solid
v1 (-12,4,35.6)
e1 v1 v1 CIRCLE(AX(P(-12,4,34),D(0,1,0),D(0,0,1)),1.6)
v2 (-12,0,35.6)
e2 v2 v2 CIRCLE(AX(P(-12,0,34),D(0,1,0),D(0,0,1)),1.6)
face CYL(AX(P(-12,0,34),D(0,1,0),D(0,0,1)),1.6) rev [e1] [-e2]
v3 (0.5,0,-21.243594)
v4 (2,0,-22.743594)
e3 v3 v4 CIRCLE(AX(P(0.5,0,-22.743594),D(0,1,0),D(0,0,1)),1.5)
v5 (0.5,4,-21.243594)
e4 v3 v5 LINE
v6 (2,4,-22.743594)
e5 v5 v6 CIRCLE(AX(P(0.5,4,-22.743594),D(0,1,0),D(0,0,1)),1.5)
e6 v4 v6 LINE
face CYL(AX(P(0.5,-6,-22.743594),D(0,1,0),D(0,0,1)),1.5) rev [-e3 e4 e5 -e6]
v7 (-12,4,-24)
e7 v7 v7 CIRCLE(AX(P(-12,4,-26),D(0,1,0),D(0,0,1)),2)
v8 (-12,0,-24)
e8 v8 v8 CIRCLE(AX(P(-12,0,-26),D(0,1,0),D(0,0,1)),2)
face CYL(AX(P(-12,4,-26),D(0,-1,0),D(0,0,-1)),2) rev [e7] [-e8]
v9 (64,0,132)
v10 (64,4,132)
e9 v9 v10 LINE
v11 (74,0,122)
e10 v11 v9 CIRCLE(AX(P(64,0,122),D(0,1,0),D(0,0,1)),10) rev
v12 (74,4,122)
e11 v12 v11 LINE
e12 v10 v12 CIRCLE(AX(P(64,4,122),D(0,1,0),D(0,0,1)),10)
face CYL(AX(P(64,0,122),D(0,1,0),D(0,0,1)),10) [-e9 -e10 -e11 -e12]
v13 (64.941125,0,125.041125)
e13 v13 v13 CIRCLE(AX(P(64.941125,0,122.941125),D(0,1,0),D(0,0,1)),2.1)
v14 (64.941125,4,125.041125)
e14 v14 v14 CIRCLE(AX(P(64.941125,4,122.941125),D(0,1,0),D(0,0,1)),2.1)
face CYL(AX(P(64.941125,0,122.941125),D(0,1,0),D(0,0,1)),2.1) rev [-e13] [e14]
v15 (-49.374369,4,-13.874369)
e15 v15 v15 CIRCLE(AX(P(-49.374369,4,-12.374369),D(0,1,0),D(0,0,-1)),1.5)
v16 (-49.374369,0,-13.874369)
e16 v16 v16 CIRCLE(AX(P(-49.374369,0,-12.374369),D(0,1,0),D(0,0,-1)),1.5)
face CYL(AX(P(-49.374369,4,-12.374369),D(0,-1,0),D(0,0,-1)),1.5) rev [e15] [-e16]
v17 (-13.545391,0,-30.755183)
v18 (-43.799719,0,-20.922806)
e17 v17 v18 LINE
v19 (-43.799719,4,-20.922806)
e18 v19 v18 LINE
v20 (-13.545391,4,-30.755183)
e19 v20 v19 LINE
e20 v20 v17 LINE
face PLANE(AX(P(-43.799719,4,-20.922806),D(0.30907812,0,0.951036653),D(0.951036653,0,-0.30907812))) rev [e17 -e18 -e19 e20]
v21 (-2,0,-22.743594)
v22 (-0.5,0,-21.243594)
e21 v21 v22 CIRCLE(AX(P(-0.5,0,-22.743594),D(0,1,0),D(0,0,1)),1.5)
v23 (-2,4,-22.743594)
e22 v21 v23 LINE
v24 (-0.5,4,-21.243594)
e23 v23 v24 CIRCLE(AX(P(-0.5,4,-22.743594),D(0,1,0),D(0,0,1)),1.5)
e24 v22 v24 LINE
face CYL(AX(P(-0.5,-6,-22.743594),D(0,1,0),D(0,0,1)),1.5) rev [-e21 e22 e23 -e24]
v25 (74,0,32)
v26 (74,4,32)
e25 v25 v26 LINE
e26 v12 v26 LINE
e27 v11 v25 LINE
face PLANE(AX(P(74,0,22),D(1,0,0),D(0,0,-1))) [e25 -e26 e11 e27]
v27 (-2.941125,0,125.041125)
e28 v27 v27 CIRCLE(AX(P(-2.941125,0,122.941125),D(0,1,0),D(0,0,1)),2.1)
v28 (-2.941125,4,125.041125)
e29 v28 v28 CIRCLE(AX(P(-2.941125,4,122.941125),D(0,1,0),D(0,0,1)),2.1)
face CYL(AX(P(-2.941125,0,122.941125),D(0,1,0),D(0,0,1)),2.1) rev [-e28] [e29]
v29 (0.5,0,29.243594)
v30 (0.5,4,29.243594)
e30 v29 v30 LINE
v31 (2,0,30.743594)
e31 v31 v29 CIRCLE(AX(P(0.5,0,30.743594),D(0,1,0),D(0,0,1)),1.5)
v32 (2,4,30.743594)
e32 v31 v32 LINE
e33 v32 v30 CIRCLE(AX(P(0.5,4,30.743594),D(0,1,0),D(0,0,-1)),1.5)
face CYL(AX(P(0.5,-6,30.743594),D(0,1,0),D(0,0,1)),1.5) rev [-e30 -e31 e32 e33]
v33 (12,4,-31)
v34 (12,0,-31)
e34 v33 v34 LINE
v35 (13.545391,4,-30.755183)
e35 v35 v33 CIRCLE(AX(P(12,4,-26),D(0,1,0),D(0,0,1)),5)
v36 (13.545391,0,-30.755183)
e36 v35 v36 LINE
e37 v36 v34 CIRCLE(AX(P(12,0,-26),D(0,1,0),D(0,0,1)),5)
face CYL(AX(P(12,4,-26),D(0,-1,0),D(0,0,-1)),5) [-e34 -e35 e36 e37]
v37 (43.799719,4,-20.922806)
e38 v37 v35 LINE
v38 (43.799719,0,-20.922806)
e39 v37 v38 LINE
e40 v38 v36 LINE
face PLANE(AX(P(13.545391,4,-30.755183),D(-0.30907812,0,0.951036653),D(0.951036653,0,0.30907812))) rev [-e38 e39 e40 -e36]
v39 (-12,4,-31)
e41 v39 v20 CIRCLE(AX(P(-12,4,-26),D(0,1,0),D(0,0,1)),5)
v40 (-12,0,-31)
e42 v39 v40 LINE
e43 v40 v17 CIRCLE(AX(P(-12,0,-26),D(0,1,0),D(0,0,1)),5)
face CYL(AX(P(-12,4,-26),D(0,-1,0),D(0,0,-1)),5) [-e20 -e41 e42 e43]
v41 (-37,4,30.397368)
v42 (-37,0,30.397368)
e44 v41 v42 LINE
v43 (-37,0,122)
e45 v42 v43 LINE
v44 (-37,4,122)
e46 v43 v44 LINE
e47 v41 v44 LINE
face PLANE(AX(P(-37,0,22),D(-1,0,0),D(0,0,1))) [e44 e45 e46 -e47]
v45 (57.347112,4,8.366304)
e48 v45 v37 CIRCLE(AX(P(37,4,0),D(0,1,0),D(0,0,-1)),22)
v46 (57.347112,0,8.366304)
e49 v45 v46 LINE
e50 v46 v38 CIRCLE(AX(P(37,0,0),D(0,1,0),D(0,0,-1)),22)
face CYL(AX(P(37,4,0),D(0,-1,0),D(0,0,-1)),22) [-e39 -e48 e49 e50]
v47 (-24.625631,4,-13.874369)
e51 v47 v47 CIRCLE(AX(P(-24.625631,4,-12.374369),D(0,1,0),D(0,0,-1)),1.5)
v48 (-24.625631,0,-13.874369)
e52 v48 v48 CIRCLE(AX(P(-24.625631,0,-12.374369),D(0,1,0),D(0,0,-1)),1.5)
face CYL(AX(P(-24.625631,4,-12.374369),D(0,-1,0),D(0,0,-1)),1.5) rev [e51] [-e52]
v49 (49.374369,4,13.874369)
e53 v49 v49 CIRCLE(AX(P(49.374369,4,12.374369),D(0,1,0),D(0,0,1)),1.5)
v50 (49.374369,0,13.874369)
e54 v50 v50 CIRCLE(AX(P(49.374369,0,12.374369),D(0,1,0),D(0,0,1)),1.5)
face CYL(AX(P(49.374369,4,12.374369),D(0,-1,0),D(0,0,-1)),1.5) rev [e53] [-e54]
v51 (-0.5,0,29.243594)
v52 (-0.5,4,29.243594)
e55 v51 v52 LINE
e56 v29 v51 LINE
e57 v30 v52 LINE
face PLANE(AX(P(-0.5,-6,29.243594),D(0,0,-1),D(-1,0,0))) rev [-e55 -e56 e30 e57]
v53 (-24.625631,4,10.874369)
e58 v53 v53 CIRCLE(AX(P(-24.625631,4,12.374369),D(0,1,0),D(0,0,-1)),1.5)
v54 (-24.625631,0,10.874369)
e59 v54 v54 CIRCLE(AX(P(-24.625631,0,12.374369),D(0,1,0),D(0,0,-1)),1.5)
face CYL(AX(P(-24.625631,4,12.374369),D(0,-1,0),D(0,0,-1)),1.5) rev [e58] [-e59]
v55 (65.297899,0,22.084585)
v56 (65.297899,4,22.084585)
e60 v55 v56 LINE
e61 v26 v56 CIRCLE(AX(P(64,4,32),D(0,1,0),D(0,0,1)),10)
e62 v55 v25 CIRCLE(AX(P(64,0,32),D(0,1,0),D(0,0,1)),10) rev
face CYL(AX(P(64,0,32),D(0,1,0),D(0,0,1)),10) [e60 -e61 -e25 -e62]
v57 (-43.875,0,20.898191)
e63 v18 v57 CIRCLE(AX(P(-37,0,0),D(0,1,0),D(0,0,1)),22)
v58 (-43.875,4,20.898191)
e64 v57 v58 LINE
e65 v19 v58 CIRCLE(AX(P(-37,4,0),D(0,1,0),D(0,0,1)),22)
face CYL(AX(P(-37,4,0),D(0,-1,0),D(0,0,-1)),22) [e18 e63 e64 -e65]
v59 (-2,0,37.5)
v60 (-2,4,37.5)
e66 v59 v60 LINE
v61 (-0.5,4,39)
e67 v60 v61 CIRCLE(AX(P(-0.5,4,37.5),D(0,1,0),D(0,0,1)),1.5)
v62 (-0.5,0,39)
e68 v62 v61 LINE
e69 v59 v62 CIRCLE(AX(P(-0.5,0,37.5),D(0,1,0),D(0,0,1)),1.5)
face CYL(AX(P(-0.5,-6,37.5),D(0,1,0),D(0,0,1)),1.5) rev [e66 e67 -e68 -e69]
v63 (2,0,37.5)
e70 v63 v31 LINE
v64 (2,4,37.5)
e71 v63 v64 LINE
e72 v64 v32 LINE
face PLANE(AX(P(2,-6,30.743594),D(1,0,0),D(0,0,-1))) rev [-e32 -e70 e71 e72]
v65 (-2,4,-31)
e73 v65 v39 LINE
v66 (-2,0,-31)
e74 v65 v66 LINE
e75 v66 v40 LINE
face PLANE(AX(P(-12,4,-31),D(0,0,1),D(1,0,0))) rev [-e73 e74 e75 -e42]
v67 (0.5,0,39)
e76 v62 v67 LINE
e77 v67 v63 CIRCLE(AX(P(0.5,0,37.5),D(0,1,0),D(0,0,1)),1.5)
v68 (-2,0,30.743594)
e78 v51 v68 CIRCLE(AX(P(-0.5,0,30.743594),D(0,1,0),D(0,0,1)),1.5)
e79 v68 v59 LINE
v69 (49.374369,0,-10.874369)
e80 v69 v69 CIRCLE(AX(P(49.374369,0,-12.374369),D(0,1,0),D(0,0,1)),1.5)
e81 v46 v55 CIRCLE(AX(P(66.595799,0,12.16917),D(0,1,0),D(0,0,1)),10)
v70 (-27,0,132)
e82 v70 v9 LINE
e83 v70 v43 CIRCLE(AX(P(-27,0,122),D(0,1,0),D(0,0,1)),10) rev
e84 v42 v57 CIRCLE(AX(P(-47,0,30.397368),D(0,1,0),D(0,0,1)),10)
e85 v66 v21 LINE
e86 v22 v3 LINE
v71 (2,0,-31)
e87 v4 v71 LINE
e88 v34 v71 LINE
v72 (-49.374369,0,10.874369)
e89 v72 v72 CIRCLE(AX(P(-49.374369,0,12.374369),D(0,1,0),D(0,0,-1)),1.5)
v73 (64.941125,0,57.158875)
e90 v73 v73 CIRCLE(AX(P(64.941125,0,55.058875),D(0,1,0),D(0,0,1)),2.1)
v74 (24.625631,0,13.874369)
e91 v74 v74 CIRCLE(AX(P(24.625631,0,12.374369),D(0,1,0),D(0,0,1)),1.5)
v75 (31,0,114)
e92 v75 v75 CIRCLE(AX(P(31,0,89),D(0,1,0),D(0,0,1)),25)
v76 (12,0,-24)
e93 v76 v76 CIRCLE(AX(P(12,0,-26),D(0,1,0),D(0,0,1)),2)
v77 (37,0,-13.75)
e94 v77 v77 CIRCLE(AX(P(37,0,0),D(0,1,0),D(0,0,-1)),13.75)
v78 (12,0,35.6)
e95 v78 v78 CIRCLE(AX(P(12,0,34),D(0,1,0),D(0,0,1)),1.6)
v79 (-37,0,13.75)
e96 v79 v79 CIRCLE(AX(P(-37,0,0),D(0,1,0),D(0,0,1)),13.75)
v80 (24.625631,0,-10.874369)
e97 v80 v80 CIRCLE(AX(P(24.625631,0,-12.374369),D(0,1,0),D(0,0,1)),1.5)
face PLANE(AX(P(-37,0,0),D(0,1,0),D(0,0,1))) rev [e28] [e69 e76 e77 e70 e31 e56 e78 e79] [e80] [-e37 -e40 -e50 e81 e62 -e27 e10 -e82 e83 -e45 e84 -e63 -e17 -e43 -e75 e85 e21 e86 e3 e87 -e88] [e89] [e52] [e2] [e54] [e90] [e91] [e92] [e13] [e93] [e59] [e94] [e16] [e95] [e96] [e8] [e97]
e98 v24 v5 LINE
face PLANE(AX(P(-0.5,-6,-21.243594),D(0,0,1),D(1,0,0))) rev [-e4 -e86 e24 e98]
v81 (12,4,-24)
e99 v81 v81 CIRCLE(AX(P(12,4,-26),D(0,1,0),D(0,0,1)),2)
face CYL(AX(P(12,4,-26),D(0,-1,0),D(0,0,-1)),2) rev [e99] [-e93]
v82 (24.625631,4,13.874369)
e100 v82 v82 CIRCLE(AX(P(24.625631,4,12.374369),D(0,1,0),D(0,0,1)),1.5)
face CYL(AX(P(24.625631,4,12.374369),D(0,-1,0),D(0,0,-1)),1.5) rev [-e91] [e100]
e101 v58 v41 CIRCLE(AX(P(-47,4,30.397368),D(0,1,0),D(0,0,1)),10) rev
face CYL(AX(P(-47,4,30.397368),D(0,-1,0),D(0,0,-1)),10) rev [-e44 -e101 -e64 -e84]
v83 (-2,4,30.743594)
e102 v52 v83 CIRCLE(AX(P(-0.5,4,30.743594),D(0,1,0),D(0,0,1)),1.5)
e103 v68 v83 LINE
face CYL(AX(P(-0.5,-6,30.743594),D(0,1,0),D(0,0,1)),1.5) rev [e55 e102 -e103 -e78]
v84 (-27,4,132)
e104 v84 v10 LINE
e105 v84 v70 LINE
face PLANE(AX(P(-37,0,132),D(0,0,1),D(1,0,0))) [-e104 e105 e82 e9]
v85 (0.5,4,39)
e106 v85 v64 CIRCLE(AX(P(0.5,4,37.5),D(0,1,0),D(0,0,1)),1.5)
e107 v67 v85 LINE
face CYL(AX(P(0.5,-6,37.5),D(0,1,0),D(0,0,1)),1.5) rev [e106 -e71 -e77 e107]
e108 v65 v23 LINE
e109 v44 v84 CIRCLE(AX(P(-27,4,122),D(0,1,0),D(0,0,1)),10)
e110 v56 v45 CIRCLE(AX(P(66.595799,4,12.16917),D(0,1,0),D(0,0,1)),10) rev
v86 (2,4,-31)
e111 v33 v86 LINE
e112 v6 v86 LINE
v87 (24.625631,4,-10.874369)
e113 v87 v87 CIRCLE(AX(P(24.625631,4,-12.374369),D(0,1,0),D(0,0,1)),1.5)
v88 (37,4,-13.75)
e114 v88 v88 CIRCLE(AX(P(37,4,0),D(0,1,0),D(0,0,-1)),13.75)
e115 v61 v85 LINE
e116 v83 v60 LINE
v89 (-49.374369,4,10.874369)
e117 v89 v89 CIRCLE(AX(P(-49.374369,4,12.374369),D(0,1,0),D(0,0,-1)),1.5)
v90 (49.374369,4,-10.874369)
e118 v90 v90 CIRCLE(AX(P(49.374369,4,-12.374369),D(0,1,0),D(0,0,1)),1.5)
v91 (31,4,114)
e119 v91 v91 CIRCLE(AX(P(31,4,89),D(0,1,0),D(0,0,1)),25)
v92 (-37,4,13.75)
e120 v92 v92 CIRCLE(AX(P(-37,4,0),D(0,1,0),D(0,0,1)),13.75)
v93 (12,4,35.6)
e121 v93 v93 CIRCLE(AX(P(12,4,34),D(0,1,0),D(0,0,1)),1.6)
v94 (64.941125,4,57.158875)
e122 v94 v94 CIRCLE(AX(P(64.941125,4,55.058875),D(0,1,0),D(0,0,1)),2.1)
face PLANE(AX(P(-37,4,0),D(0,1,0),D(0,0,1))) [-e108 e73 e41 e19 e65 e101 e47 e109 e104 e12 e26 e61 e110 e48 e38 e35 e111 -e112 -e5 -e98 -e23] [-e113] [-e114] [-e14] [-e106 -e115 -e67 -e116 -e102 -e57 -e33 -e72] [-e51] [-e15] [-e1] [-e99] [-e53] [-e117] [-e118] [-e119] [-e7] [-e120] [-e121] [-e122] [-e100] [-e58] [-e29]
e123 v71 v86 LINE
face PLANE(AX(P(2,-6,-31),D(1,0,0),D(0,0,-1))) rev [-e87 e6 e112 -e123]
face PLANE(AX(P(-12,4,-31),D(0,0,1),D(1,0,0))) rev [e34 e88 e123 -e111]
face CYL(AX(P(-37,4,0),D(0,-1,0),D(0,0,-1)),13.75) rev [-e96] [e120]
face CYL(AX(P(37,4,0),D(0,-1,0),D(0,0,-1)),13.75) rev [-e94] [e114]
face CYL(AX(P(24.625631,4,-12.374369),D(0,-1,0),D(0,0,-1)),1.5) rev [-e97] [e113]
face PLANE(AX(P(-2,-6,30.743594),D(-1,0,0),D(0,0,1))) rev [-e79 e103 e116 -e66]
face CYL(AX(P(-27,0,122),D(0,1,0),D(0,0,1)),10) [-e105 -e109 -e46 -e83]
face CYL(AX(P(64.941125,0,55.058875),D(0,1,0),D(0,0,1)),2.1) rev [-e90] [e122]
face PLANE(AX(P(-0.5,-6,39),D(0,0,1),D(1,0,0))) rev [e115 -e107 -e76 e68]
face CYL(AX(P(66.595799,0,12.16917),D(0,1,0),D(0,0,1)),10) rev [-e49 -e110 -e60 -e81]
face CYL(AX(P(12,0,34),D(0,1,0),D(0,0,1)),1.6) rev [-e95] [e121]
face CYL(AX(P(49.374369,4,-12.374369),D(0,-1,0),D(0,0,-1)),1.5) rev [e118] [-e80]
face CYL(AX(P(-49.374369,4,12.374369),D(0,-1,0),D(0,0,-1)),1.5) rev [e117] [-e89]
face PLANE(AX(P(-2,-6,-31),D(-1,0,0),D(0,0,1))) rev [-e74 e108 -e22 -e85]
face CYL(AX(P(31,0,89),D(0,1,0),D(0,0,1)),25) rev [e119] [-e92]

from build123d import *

# Parameters (mm, degrees)
SKETCH_1_R          = 2
SKETCH_1_R_2        = 1.5
SKETCH_1_R_3        = 13.75
EXTRUDE_1_DEPTH     = 4
SKETCH1_W           = 111
SKETCH1_H           = 110
SKETCH1_R           = 1.6
SKETCH1_R_2         = 2.1
SKETCH1_R_3         = 25
BOSS_EXTRUDE1_DEPTH = 4
FILLET1_R           = 10
FILLET2_DEPTH       = 4
CUT_EXTRUDE1_DEPTH  = 10


with BuildPart() as part:
    # 草图1 → 凸台-拉伸1 (new body)
    with BuildSketch(Plane(origin=(0, 0, 0), x_dir=(1, 0, 0), z_dir=(0, 1, 0))):
        with BuildLine():
            Line((-43.799718629, 20.922806374), (-13.545390598, 30.755183267))
            ThreePointArc((-13.545390598, 30.755183267), (-12.782331025, 30.938416565), (-12, 31))
            Line((-12, 31), (12, 31))
            ThreePointArc((12, 31), (12.782331025, 30.938416565), (13.545390598, 30.755183267))
            Line((13.545390598, 30.755183267), (43.799718629, 20.922806374))
            ThreePointArc((43.799718629, 20.922806374), (58.729032885, -3.442256511), (37, -22))
            Line((37, -22), (-37, -22))
            ThreePointArc((-37, -22), (-58.729032885, -3.442256511), (-43.799718629, 20.922806374))
        make_face()
        with Locations(Location((-12, 26, 0), (0, 0, 270))):
            Circle(SKETCH_1_R, mode=Mode.SUBTRACT)
        with Locations(Location((12, 26, 0), (0, 0, 270))):
            Circle(SKETCH_1_R, mode=Mode.SUBTRACT)
        with Locations(Location((49.374368671, 12.374368671, 0), (0, 0, 270))):
            Circle(SKETCH_1_R_2, mode=Mode.SUBTRACT)
        with Locations(Location((49.374368671, -12.374368671, 0), (0, 0, 270))):
            Circle(SKETCH_1_R_2, mode=Mode.SUBTRACT)
        with Locations(Location((24.625631329, -12.374368671, 0), (0, 0, 270))):
            Circle(SKETCH_1_R_2, mode=Mode.SUBTRACT)
        with Locations(Location((24.625631329, 12.374368671, 0), (0, 0, 270))):
            Circle(SKETCH_1_R_2, mode=Mode.SUBTRACT)
        with Locations(Location((-49.374368671, -12.374368671, 0), (0, 0, 90))):
            Circle(SKETCH_1_R_2, mode=Mode.SUBTRACT)
        with Locations(Location((-24.625631329, -12.374368671, 0), (0, 0, 90))):
            Circle(SKETCH_1_R_2, mode=Mode.SUBTRACT)
        with Locations(Location((-49.374368671, 12.374368671, 0), (0, 0, 90))):
            Circle(SKETCH_1_R_2, mode=Mode.SUBTRACT)
        with Locations(Location((-24.625631329, 12.374368671, 0), (0, 0, 90))):
            Circle(SKETCH_1_R_2, mode=Mode.SUBTRACT)
        with Locations(Location((-37, 0, 0), (0, 0, 270))):
            Circle(SKETCH_1_R_3, mode=Mode.SUBTRACT)
        with Locations(Location((37, 0, 0), (0, 0, 90))):
            Circle(SKETCH_1_R_3, mode=Mode.SUBTRACT)
    extrude(amount=EXTRUDE_1_DEPTH)

    # Sketch1 → Boss-Extrude1 (add)
    with BuildSketch(Plane(origin=(0, 4, 0), x_dir=(1, 0, 0), z_dir=(0, 1, 0))):
        with Locations((18.5, -77)):
            Rectangle(SKETCH1_W, SKETCH1_H)
        with Locations(Location((12, -34, 0), (0, 0, 270))):
            Circle(SKETCH1_R, mode=Mode.SUBTRACT)
        with Locations(Location((-12, -34, 0), (0, 0, 270))):
            Circle(SKETCH1_R, mode=Mode.SUBTRACT)
        with Locations(Location((-2.941125497, -122.941125497, 0), (0, 0, 270))):
            Circle(SKETCH1_R_2, mode=Mode.SUBTRACT)
        with Locations(Location((64.941125497, -122.941125497, 0), (0, 0, 270))):
            Circle(SKETCH1_R_2, mode=Mode.SUBTRACT)
        with Locations(Location((64.941125497, -55.058874503, 0), (0, 0, 270))):
            Circle(SKETCH1_R_2, mode=Mode.SUBTRACT)
        with Locations(Location((31, -89, 0), (0, 0, 270))):
            Circle(SKETCH1_R_3, mode=Mode.SUBTRACT)
    extrude(amount=-BOSS_EXTRUDE1_DEPTH)

    # Fillet1
    fillet1_edges = [part.edges().sort_by_distance(p)[0] for p in [
        (-37, 2, 22),
        (-37, 2, 132),
        (74, 2, 22),
        (74, 2, 132),
    ]]
    fillet(fillet1_edges, radius=FILLET1_R)

    # Fillet2: read off the stored shape, not the designer's step
    # Fillet2 outline → Fillet2 (add)
    with BuildSketch(Plane(origin=(0, 0, 0), x_dir=(1, 0, 0), z_dir=(0, 1, 0))):
        with BuildLine():
            ThreePointArc((65.297899409, -22.084584874), (57.943895671, -17.183606101), (57.347111687, -8.366304201))
            ThreePointArc((57.347111687, -8.366304201), (49.246250601, -18.276469742), (37, -22))
            Line((37, -22), (64, -22))
            ThreePointArc((64, -22), (64.650326356, -22.021168624), (65.297899409, -22.084584874))
        make_face()
    extrude(amount=FILLET2_DEPTH)

    # Sketch2 → Cut-Extrude1 (cut)
    with BuildSketch(Plane(origin=(0, 4, 0), x_dir=(1, 0, 0), z_dir=(0, 1, 0))):
        with BuildLine():
            Line((-2, 31), (2, 31))
            Line((2, 31), (2, 22.743593539))
            ThreePointArc((2, 22.743593539), (1.560660172, 21.682933368), (0.5, 21.243593539))
            Line((0.5, 21.243593539), (-0.5, 21.243593539))
            ThreePointArc((-0.5, 21.243593539), (-1.560660172, 21.682933368), (-2, 22.743593539))
            Line((-2, 22.743593539), (-2, 31))
        make_face()
        with BuildLine():
            Line((-0.5, -29.243593539), (0.5, -29.243593539))
            ThreePointArc((0.5, -29.243593539), (1.560660172, -29.682933368), (2, -30.743593539))
            Line((2, -30.743593539), (2, -37.5))
            ThreePointArc((2, -37.5), (1.560660172, -38.560660172), (0.5, -39))
            Line((0.5, -39), (-0.5, -39))
            ThreePointArc((-0.5, -39), (-1.560660172, -38.560660172), (-2, -37.5))
            Line((-2, -37.5), (-2, -30.743593539))
            ThreePointArc((-2, -30.743593539), (-1.560660172, -29.682933368), (-0.5, -29.243593539))
        make_face()
    extrude(amount=-CUT_EXTRUDE1_DEPTH, mode=Mode.SUBTRACT)


solid = part.part
